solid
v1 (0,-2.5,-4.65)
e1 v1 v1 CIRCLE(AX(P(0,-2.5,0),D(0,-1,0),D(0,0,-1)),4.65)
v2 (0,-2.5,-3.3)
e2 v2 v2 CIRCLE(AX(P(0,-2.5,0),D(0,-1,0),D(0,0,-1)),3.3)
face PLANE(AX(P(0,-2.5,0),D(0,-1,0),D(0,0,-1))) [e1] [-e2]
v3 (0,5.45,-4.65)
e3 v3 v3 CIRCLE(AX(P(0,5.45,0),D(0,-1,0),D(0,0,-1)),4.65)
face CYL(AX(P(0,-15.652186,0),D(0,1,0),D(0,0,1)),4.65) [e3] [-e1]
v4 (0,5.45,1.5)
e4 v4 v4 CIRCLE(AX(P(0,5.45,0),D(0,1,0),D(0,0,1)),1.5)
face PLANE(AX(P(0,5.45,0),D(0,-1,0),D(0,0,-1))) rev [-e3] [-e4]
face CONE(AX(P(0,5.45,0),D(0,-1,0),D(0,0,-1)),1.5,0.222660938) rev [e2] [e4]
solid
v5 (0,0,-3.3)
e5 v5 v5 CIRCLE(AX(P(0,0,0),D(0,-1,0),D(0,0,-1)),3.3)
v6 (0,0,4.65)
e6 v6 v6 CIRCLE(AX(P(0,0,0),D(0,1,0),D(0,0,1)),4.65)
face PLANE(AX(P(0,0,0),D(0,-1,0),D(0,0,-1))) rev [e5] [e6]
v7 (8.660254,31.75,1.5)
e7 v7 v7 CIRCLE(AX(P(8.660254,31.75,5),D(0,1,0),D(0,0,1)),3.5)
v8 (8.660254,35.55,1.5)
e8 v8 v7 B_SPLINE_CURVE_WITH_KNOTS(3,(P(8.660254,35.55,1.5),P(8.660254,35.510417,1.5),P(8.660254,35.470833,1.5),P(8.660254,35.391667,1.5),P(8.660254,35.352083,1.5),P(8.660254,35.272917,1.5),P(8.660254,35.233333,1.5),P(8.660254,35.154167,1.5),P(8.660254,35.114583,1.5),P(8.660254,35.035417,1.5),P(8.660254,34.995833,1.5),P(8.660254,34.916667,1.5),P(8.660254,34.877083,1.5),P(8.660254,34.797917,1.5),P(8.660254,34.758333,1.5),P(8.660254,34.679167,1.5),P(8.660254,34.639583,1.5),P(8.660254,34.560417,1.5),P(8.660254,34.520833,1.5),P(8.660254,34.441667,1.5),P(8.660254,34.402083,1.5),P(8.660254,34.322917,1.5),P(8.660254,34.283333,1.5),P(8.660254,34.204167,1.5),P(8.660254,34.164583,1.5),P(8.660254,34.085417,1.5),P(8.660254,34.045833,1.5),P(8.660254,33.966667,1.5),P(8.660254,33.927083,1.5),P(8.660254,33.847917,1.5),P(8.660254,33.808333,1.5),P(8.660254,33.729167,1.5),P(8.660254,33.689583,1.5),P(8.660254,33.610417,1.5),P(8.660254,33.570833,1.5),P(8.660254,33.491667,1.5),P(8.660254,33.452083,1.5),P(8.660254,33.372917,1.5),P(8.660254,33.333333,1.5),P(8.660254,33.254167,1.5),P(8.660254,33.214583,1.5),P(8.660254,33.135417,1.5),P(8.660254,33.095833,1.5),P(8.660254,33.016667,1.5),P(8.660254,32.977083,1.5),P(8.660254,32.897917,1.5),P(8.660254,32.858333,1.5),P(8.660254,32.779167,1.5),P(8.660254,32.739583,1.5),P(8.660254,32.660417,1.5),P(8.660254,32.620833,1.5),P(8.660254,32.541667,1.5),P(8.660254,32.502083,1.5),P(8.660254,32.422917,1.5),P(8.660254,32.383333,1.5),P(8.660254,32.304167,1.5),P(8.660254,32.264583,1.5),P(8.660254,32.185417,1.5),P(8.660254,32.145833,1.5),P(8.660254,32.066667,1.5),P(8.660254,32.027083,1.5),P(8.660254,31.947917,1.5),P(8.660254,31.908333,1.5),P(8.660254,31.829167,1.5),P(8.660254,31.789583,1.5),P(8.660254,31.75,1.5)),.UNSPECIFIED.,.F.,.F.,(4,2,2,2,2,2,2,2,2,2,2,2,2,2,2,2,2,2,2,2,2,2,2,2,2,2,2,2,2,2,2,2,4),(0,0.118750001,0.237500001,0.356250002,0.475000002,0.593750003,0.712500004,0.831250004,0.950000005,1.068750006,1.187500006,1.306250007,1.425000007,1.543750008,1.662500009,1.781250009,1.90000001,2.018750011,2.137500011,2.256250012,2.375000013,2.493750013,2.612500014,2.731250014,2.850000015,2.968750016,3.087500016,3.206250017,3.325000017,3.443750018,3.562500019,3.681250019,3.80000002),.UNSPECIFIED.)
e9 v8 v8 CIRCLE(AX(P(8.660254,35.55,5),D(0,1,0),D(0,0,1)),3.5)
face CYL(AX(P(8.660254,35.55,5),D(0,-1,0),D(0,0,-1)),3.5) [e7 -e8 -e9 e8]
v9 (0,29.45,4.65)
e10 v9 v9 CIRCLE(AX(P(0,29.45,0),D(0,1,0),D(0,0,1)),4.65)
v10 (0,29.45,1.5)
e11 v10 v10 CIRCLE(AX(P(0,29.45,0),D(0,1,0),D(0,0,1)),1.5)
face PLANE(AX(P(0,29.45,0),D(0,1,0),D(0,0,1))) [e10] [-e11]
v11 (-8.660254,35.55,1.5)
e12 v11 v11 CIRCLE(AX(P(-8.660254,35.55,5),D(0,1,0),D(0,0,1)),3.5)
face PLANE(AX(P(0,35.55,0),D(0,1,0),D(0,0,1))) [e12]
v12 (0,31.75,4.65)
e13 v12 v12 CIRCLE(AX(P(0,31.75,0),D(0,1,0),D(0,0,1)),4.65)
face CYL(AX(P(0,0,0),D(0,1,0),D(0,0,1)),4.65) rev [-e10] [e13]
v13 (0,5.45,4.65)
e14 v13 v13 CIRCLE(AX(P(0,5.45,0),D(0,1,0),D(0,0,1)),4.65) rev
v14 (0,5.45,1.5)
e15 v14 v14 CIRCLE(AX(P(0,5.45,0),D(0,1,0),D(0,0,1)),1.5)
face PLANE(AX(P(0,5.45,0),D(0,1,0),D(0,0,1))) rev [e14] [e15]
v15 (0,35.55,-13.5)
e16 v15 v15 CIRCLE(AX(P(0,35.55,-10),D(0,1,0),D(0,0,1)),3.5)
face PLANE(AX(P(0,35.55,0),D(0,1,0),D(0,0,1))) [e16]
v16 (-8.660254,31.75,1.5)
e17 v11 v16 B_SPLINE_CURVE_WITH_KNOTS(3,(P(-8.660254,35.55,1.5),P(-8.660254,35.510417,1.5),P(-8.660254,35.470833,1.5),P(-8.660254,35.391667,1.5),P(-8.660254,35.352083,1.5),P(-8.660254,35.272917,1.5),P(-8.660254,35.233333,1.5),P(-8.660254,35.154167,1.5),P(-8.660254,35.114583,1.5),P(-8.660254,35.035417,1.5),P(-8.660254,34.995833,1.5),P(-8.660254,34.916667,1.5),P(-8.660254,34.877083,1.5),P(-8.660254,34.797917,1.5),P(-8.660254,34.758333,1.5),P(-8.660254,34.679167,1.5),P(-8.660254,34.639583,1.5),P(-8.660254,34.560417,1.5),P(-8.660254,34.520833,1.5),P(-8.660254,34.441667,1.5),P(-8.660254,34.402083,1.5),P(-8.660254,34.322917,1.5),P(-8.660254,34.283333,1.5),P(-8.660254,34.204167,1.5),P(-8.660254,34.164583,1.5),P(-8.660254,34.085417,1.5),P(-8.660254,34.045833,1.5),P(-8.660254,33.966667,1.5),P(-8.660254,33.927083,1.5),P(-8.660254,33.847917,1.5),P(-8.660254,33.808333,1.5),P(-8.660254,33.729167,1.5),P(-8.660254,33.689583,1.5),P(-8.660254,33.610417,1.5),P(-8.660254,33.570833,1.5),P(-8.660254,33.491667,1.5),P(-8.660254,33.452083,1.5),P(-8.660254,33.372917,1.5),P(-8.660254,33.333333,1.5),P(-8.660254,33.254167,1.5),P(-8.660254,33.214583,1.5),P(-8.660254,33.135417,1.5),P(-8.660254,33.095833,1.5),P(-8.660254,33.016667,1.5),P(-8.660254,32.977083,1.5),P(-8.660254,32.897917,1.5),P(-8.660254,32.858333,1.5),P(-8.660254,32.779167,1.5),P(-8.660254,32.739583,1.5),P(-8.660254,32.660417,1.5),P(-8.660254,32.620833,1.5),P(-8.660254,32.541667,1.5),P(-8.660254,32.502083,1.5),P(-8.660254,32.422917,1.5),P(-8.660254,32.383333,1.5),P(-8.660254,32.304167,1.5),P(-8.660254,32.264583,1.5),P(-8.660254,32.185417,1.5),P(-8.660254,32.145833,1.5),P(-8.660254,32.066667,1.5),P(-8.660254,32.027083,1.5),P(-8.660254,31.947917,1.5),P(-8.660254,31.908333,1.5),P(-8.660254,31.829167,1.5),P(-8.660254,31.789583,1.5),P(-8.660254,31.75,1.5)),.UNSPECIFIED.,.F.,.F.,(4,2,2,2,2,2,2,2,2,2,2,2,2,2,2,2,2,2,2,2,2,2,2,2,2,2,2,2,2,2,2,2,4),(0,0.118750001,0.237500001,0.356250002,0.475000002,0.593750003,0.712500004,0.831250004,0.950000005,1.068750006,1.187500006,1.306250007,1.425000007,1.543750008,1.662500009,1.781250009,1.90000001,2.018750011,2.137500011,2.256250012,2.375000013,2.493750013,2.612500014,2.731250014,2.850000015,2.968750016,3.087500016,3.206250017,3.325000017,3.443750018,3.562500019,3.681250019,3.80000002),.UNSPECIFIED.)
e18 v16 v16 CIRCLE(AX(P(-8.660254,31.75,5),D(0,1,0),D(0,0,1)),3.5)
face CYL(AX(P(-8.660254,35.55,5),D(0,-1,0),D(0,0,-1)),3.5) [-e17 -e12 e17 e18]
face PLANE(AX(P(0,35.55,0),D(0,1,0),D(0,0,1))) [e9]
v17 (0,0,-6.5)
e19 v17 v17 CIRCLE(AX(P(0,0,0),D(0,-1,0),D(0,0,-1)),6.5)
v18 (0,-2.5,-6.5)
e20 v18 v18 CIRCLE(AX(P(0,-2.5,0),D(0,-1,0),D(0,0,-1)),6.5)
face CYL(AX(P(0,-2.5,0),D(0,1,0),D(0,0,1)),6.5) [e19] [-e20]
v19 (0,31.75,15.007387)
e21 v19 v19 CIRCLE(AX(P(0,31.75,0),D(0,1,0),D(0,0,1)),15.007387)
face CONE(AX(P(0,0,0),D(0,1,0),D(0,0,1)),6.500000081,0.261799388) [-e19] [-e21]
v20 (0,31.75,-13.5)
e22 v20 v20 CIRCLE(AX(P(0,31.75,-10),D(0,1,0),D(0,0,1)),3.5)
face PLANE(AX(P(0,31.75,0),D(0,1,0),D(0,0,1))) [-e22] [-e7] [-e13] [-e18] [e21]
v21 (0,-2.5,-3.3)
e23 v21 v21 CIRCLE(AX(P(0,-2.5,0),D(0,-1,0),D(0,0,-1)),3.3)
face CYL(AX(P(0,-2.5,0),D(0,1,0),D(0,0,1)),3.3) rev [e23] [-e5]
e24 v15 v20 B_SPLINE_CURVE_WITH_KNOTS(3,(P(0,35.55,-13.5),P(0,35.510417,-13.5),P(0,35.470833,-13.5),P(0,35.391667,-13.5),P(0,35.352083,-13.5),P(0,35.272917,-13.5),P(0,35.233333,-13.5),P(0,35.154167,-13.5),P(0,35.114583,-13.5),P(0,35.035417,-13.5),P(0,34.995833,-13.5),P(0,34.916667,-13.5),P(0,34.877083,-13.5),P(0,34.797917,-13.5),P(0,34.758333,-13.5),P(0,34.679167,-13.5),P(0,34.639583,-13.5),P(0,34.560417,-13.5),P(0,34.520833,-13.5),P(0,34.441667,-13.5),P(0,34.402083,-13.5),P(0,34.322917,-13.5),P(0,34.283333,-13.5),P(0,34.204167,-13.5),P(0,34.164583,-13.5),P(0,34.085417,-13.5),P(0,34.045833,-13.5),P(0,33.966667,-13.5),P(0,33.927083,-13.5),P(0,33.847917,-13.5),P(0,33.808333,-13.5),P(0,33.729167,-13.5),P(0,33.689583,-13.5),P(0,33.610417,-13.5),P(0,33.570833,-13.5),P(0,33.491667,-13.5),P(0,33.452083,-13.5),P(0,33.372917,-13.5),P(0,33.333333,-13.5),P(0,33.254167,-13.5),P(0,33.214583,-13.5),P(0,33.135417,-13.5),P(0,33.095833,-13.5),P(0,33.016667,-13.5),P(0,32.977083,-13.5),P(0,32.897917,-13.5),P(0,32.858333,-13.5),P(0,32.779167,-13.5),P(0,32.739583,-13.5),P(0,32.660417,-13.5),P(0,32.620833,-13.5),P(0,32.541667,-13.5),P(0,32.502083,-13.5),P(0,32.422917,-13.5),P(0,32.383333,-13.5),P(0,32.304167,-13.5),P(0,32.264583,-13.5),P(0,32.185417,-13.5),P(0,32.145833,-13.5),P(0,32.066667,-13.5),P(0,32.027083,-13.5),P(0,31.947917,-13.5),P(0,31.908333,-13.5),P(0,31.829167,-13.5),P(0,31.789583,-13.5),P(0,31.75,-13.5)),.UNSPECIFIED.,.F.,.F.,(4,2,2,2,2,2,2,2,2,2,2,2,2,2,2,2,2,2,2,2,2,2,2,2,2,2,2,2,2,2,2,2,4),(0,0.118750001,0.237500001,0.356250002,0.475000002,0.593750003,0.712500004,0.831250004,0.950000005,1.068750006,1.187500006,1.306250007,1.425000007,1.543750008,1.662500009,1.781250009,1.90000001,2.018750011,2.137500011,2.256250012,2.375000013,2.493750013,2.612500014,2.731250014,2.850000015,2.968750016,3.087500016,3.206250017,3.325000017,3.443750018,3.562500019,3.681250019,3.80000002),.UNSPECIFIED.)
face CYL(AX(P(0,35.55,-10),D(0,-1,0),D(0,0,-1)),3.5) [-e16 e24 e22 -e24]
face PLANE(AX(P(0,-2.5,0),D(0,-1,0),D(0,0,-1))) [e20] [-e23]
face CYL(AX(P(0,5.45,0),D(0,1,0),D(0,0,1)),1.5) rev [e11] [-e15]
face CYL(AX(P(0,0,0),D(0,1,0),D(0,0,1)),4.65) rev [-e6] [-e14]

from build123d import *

# Parameters (mm, degrees)
SKETCH1_R            = 6.500000081
ANGLEBODY_DEPTH      = 31.75
ANGLEBODY_DRAFT      = -15
SKETCH2_R            = 4.649999971
SKETCH2_R_2          = 1.93499994
CENTERHOLE_DEPTH     = 39.190389178
F_40TPEGS_DEPTH      = 3.80000002
SKETCH3_R            = 6.500000081
SKETCH3_R_2          = 3.300000004
F_20TINTERFACE_DEPTH = 2.50000008
BOSS_EXTRUDE1_START  = -2.299999972
SKETCH4_R            = 4.649999971
SKETCH4_R_2          = 1.5
BOSS_EXTRUDE1_DEPTH  = 24
SKETCH5_R            = 4.649999971
SKETCH5_R_2          = 1.5
BOSS_EXTRUDE2_DEPTH  = 7.950000108


# Read off the part's stored shape, not the designer's step: Cut-Loft1
with BuildPart() as part:
    # Sketch1 → AngleBody (with draft: the straight prism first)
    with BuildSketch(Plane(origin=(0, 0, 0), x_dir=(1, 0, 0), z_dir=(0, 1, 0))):
        Circle(SKETCH1_R)
    extrude(amount=ANGLEBODY_DEPTH)
    # AngleBody: the draft: its side faces are tilted about the plane it starts from
    anglebody_sides = [part.faces().sort_by_distance(p)[0] for p in [
        (-6.500000081, 15.875, 0),
    ]]
    draft(anglebody_sides, Plane(origin=(0, 0, 0), x_dir=(1, 0, 0), z_dir=(0, 1, 0)), ANGLEBODY_DRAFT)

    # Sketch2 → CenterHole (cut, through all)
    # profile 1 of 2: a face of its own
    with BuildSketch(Plane(origin=(0, 31.75, 0), x_dir=(1, 0, 0), z_dir=(0, 1, 0))):
        with Locations(Location((0, 0, 0), (0, 0, 270))):
            Circle(SKETCH2_R)
        Circle(SKETCH2_R_2, mode=Mode.SUBTRACT)
    # profile 2 of 2: a face of its own
    with BuildSketch(Plane(origin=(0, 31.75, 0), x_dir=(1, 0, 0), z_dir=(0, 1, 0))):
        Circle(SKETCH2_R_2)
    extrude(amount=-CENTERHOLE_DEPTH, mode=Mode.SUBTRACT)

    # Sketch2<3> → 40tPegs (add)
    with BuildSketch(Plane(origin=(0, 31.75, 0), x_dir=(1, 0, 0), z_dir=(0, 1, 0))):
        with BuildLine():
            ThreePointArc((3.499999985, 10.000000066), (-1.749999993, 13.031088966), (-1.749999992, 6.968911166))
            Line((-1.749999992, 6.968911166), (0, 10.000000066))
            Line((0, 10.000000066), (1.749999992, 6.968911166))
            ThreePointArc((1.749999992, 6.968911166), (3.0310889, 8.250000073), (3.499999985, 10.000000066))
        make_face()
        with BuildLine():
            Line((0, 10.000000066), (-1.749999992, 6.968911166))
            ThreePointArc((-1.749999992, 6.968911166), (0, 6.500000081), (1.749999992, 6.968911166))
            Line((1.749999992, 6.968911166), (0, 10.000000066))
        make_face()
        with BuildLine():
            Line((-6.910254103, -1.968911133), (-8.660254095, -5.000000033))
            Line((-8.660254095, -5.000000033), (-5.16025411, -5.000000033))
            ThreePointArc((-5.16025411, -5.000000033), (-5.629165195, -3.25000004), (-6.910254103, -1.968911133))
        make_face()
        with BuildLine():
            Line((-5.16025411, -5.000000033), (-8.660254095, -5.000000033))
            Line((-8.660254095, -5.000000033), (-6.910254103, -1.968911133))
            ThreePointArc((-6.910254103, -1.968911133), (-11.691342995, -6.750000026), (-5.16025411, -5.000000033))
        make_face()
        with BuildLine():
            ThreePointArc((6.910254103, -1.968911133), (5.629165195, -3.25000004), (5.16025411, -5.000000033))
            Line((5.16025411, -5.000000033), (8.660254095, -5.000000033))
            Line((8.660254095, -5.000000033), (6.910254103, -1.968911133))
        make_face()
        with BuildLine():
            Line((8.660254095, -5.000000033), (5.16025411, -5.000000033))
            ThreePointArc((5.16025411, -5.000000033), (8.660254095, -8.500000018), (12.16025408, -5.000000033))
            ThreePointArc((12.16025408, -5.000000033), (10.410254088, -1.968911133), (6.910254103, -1.968911133))
            Line((6.910254103, -1.968911133), (8.660254095, -5.000000033))
        make_face()
    extrude(amount=F_40TPEGS_DEPTH)

    # Sketch3 → 20tInterface (add)
    with BuildSketch(Plane.XZ):
        with Locations(Location((0, 0, 0), (0, 0, 270))):
            Circle(SKETCH3_R)
        with Locations(Location((0, 0, 0), (0, 0, 270))):
            Circle(SKETCH3_R_2, mode=Mode.SUBTRACT)
    extrude(amount=F_20TINTERFACE_DEPTH)

    # Sketch4 → Boss-Extrude1 (add)
    with BuildSketch(Plane(origin=(0, 31.75, 0), x_dir=(1, 0, 0), z_dir=(0, 1, 0)).offset(BOSS_EXTRUDE1_START)):
        with Locations(Location((0, 0, 0), (0, 0, 270))):
            Circle(SKETCH4_R)
        with Locations(Location((0, 0, 0), (0, 0, 270))):
            Circle(SKETCH4_R_2, mode=Mode.SUBTRACT)
    extrude(amount=-BOSS_EXTRUDE1_DEPTH)


with BuildPart() as body_2:
    # Sketch5 → Boss-Extrude2 (new body)
    with BuildSketch(Plane.XZ.offset(-5.450000028)):
        with Locations(Location((0, 0, 0), (0, 0, 270))):
            Circle(SKETCH5_R)
        with Locations(Location((0, 0, 0), (0, 0, 270))):
            Circle(SKETCH5_R_2, mode=Mode.SUBTRACT)
    extrude(amount=BOSS_EXTRUDE2_DEPTH)

    # Cut-Loft1 outline → Cut-Loft1 (revolve, cut)
    with BuildSketch(Plane.XY):
        Polygon((3.300000004, -2.50000008), (1.5, 5.450000028), (1.5, -2.50000008), align=None)
    revolve(axis=Axis((0, 0, 0), (0, 1, 0)), mode=Mode.SUBTRACT)


solid = Compound([part.part, body_2.part])
